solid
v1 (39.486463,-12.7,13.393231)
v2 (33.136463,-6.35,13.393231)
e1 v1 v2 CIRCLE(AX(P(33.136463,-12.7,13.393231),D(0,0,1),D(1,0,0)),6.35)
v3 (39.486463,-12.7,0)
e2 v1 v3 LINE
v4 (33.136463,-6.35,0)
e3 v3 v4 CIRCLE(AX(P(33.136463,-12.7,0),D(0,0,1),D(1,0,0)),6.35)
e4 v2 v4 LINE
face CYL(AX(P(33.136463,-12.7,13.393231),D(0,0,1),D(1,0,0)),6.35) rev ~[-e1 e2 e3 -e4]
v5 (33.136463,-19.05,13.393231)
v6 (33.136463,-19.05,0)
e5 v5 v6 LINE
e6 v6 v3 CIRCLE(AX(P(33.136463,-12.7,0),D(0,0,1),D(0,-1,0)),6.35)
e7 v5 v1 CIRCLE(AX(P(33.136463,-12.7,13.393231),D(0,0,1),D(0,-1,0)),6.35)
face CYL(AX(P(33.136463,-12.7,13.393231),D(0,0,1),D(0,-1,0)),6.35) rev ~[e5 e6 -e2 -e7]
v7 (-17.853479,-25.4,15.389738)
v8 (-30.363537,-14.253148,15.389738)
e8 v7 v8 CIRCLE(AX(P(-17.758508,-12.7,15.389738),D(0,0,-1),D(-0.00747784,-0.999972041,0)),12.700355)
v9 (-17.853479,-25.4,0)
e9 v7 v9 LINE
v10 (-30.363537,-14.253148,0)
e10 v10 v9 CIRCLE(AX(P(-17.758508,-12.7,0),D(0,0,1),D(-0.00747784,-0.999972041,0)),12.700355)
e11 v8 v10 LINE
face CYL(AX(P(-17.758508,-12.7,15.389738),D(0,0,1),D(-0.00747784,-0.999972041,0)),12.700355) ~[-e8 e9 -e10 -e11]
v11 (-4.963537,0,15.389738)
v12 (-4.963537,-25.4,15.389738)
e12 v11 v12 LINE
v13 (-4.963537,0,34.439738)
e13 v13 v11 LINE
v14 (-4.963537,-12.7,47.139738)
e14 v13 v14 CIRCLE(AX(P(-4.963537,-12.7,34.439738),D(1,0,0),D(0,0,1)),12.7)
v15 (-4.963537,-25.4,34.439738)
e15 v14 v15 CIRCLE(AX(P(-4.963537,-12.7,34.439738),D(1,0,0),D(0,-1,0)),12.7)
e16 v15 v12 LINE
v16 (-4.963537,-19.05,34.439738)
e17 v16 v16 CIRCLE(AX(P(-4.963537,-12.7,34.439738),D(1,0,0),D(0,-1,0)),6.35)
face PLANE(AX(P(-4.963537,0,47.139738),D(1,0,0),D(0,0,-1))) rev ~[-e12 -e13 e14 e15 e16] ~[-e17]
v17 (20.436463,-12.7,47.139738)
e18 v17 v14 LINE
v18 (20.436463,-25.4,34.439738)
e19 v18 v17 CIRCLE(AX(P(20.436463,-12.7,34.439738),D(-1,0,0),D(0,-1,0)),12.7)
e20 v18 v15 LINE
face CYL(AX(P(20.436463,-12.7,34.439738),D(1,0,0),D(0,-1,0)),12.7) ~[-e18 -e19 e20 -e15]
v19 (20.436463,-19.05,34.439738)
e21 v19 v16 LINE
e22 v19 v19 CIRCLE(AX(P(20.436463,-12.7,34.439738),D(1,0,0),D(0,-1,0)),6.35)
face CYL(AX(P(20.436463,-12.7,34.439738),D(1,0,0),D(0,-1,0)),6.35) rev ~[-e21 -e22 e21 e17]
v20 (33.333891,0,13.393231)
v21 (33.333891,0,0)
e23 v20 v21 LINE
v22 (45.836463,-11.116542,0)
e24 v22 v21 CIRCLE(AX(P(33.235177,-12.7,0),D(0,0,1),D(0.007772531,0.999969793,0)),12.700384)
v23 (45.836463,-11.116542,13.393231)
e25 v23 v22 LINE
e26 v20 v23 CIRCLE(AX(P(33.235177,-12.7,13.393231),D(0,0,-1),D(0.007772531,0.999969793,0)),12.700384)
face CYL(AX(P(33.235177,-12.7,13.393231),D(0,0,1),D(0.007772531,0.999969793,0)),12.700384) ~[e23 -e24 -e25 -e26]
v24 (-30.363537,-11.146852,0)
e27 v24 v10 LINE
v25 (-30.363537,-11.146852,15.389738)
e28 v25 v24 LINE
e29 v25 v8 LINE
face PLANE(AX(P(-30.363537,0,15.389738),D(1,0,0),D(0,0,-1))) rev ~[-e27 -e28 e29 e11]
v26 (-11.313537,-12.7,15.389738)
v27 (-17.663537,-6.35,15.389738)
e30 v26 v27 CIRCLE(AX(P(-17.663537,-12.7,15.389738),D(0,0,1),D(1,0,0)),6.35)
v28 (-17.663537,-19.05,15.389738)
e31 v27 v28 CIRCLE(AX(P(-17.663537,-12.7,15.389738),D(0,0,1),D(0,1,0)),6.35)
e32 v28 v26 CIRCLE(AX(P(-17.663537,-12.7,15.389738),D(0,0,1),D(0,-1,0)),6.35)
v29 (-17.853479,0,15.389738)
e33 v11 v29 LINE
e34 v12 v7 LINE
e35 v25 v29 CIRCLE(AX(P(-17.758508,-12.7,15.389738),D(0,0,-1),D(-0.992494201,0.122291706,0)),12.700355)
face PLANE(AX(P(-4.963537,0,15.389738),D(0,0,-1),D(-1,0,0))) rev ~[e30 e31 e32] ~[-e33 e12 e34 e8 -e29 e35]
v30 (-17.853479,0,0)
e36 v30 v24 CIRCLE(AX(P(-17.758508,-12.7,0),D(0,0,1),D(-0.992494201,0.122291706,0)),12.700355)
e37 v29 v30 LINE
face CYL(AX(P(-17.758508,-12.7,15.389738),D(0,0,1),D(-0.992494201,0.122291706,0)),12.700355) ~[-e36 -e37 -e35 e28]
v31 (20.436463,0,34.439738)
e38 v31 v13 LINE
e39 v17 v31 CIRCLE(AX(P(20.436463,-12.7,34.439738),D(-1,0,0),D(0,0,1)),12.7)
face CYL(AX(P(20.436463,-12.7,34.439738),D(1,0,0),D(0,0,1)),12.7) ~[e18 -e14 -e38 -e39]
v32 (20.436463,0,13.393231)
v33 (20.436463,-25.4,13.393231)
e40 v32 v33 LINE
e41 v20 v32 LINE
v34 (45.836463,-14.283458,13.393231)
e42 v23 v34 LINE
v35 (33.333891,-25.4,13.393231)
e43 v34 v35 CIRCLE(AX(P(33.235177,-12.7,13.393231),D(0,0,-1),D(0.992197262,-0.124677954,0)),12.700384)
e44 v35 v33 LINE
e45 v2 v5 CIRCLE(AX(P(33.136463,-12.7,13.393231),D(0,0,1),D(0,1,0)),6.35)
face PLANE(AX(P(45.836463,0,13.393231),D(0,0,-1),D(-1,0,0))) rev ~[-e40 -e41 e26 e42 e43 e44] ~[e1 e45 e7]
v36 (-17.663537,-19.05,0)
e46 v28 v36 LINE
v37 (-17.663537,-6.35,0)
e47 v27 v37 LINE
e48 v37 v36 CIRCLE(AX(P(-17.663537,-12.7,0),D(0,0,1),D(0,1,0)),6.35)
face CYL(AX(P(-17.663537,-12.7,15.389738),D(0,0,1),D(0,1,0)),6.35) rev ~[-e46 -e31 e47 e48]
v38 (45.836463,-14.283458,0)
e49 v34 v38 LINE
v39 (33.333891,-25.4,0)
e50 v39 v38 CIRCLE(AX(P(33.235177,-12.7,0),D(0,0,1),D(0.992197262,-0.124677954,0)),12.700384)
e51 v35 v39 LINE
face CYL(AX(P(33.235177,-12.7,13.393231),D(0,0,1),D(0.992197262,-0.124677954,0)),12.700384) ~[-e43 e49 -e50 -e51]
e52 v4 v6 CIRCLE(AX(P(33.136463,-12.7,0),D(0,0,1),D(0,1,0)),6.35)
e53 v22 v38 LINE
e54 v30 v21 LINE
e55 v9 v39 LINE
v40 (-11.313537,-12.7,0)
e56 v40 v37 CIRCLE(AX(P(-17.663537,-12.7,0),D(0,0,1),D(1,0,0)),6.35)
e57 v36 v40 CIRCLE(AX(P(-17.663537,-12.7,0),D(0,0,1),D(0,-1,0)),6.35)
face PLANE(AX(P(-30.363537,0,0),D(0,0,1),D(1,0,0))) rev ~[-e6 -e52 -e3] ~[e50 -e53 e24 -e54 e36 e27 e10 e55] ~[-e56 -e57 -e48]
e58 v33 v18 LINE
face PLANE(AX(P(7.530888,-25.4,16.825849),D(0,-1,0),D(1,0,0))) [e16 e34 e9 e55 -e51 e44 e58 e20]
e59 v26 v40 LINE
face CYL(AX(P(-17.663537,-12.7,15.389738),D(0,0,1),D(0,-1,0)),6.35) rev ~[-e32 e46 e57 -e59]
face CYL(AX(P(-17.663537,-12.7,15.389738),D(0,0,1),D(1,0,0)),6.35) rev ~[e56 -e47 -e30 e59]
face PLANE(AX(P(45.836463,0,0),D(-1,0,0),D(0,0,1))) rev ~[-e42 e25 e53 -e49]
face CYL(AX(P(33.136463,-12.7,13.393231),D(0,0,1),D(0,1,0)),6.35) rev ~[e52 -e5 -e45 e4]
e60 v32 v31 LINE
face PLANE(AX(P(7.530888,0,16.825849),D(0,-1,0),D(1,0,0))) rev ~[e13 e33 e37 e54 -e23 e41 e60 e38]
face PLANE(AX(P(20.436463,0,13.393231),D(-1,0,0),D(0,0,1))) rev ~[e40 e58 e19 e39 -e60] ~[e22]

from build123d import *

# Parameters (mm, degrees)
F1_DEPTH = 25.4
F3_DEPTH = 50.801
F5_DEPTH = 13.394231155
F7_DEPTH = 15.3907378061


with BuildPart() as f1:
    # F0 (on Front) → F1 (new body)
    with BuildSketch(Plane.XZ):
        Polygon((-30.3635369193, 15.3897378061), (-30.3635369193, 0), (45.8364630807, 0), (45.8364630807, 13.393231155), (20.4364630807, 13.393231155), (20.4364630807, 47.1397378061), (-4.9635369193, 47.1397378061), (-4.9635369193, 15.3897378061), align=None)
    extrude(amount=F1_DEPTH)

    # F2 (on face) → F3 (cut, through all)
    with BuildSketch(Plane.YZ.offset(20.4364630807)):
        with BuildLine():
            Line((-19.05, 34.4397378061), (-6.35, 34.4397378061))
            ThreePointArc((-6.35, 34.4397378061), (-12.7, 40.7897378061), (-19.05, 34.4397378061))
        make_face()
        with BuildLine():
            ThreePointArc((-25.4, 34.4397378061), (-21.6802561211, 43.4199939272), (-12.7, 47.1397378061))
            Line((-12.7, 47.1397378061), (-25.4, 47.1397378061))
            Line((-25.4, 47.1397378061), (-25.4, 34.4397378061))
        make_face()
        with BuildLine():
            ThreePointArc((-12.7, 47.1397378061), (-3.7197438789, 43.4199939272), (0, 34.4397378061))
            Line((0, 34.4397378061), (0, 47.1397378061))
            Line((0, 47.1397378061), (-12.7, 47.1397378061))
        make_face()
        with BuildLine():
            ThreePointArc((-19.05, 34.4397378061), (-12.7, 28.0897378061), (-6.35, 34.4397378061))
            Line((-6.35, 34.4397378061), (-19.05, 34.4397378061))
        make_face()
    extrude(amount=-F3_DEPTH, mode=Mode.SUBTRACT)

    # F4 (on face) → F5 (cut, through all)
    with BuildSketch(Plane.XY.offset(13.393231155)):
        with BuildLine():
            ThreePointArc((39.4864630807, -12.7), (37.6265911412, -8.2098719395), (33.1364630807, -6.35))
            Line((33.1364630807, -6.35), (33.1364630807, -19.05))
            ThreePointArc((33.1364630807, -19.05), (37.6265911412, -17.1901280605), (39.4864630807, -12.7))
        make_face()
        with BuildLine():
            Line((33.1364630807, -19.05), (33.1364630807, -6.35))
            ThreePointArc((33.1364630807, -6.35), (26.7864630807, -12.7), (33.1364630807, -19.05))
        make_face()
        with BuildLine():
            Line((45.8364630807, 0), (33.33389133, 0))
            ThreePointArc((33.33389133, 0), (41.6741864681, -3.2088005425), (45.8364630807, -11.1165421488))
            Line((45.8364630807, -11.1165421488), (45.8364630807, 0))
        make_face()
        with BuildLine():
            ThreePointArc((45.8364630807, -14.2834578512), (45.9355608404, -12.7), (45.8364630807, -11.1165421488))
            Line((45.8364630807, -11.1165421488), (45.8364630807, -14.2834578512))
        make_face()
        with BuildLine():
            Line((45.8364630807, -25.4), (45.8364630807, -14.2834578512))
            ThreePointArc((45.8364630807, -14.2834578512), (41.6741864681, -22.1911994575), (33.33389133, -25.4))
            Line((33.33389133, -25.4), (45.8364630807, -25.4))
        make_face()
    extrude(amount=-F5_DEPTH, mode=Mode.SUBTRACT)

    # F6 (on face) → F7 (cut, through all)
    with BuildSketch(Plane.XY.offset(15.3897378061)):
        with BuildLine():
            ThreePointArc((-11.3135369193, -12.7), (-13.1734088588, -8.2098719395), (-17.6635369193, -6.35))
            Line((-17.6635369193, -6.35), (-17.6635369193, -19.05))
            ThreePointArc((-17.6635369193, -19.05), (-13.1734088588, -17.1901280605), (-11.3135369193, -12.7))
        make_face()
        with BuildLine():
            Line((-17.6635369193, -19.05), (-17.6635369193, -6.35))
            ThreePointArc((-17.6635369193, -6.35), (-24.0135369193, -12.7), (-17.6635369193, -19.05))
        make_face()
        with BuildLine():
            ThreePointArc((-30.3635369193, -11.1468519042), (-26.2075067106, -3.2177300877), (-17.8534793608, 0))
            Line((-17.8534793608, 0), (-30.3635369193, 0))
            Line((-30.3635369193, 0), (-30.3635369193, -11.1468519042))
        make_face()
        with BuildLine():
            Line((-30.3635369193, -14.2531480958), (-30.3635369193, -11.1468519042))
            ThreePointArc((-30.3635369193, -11.1468519042), (-30.4588632348, -12.7), (-30.3635369193, -14.2531480958))
        make_face()
        with BuildLine():
            ThreePointArc((-17.8534793608, -25.4), (-26.2075067106, -22.1822699123), (-30.3635369193, -14.2531480958))
            Line((-30.3635369193, -14.2531480958), (-30.3635369193, -25.4))
            Line((-30.3635369193, -25.4), (-17.8534793608, -25.4))
        make_face()
    extrude(amount=-F7_DEPTH, mode=Mode.SUBTRACT)


solid = f1.part
